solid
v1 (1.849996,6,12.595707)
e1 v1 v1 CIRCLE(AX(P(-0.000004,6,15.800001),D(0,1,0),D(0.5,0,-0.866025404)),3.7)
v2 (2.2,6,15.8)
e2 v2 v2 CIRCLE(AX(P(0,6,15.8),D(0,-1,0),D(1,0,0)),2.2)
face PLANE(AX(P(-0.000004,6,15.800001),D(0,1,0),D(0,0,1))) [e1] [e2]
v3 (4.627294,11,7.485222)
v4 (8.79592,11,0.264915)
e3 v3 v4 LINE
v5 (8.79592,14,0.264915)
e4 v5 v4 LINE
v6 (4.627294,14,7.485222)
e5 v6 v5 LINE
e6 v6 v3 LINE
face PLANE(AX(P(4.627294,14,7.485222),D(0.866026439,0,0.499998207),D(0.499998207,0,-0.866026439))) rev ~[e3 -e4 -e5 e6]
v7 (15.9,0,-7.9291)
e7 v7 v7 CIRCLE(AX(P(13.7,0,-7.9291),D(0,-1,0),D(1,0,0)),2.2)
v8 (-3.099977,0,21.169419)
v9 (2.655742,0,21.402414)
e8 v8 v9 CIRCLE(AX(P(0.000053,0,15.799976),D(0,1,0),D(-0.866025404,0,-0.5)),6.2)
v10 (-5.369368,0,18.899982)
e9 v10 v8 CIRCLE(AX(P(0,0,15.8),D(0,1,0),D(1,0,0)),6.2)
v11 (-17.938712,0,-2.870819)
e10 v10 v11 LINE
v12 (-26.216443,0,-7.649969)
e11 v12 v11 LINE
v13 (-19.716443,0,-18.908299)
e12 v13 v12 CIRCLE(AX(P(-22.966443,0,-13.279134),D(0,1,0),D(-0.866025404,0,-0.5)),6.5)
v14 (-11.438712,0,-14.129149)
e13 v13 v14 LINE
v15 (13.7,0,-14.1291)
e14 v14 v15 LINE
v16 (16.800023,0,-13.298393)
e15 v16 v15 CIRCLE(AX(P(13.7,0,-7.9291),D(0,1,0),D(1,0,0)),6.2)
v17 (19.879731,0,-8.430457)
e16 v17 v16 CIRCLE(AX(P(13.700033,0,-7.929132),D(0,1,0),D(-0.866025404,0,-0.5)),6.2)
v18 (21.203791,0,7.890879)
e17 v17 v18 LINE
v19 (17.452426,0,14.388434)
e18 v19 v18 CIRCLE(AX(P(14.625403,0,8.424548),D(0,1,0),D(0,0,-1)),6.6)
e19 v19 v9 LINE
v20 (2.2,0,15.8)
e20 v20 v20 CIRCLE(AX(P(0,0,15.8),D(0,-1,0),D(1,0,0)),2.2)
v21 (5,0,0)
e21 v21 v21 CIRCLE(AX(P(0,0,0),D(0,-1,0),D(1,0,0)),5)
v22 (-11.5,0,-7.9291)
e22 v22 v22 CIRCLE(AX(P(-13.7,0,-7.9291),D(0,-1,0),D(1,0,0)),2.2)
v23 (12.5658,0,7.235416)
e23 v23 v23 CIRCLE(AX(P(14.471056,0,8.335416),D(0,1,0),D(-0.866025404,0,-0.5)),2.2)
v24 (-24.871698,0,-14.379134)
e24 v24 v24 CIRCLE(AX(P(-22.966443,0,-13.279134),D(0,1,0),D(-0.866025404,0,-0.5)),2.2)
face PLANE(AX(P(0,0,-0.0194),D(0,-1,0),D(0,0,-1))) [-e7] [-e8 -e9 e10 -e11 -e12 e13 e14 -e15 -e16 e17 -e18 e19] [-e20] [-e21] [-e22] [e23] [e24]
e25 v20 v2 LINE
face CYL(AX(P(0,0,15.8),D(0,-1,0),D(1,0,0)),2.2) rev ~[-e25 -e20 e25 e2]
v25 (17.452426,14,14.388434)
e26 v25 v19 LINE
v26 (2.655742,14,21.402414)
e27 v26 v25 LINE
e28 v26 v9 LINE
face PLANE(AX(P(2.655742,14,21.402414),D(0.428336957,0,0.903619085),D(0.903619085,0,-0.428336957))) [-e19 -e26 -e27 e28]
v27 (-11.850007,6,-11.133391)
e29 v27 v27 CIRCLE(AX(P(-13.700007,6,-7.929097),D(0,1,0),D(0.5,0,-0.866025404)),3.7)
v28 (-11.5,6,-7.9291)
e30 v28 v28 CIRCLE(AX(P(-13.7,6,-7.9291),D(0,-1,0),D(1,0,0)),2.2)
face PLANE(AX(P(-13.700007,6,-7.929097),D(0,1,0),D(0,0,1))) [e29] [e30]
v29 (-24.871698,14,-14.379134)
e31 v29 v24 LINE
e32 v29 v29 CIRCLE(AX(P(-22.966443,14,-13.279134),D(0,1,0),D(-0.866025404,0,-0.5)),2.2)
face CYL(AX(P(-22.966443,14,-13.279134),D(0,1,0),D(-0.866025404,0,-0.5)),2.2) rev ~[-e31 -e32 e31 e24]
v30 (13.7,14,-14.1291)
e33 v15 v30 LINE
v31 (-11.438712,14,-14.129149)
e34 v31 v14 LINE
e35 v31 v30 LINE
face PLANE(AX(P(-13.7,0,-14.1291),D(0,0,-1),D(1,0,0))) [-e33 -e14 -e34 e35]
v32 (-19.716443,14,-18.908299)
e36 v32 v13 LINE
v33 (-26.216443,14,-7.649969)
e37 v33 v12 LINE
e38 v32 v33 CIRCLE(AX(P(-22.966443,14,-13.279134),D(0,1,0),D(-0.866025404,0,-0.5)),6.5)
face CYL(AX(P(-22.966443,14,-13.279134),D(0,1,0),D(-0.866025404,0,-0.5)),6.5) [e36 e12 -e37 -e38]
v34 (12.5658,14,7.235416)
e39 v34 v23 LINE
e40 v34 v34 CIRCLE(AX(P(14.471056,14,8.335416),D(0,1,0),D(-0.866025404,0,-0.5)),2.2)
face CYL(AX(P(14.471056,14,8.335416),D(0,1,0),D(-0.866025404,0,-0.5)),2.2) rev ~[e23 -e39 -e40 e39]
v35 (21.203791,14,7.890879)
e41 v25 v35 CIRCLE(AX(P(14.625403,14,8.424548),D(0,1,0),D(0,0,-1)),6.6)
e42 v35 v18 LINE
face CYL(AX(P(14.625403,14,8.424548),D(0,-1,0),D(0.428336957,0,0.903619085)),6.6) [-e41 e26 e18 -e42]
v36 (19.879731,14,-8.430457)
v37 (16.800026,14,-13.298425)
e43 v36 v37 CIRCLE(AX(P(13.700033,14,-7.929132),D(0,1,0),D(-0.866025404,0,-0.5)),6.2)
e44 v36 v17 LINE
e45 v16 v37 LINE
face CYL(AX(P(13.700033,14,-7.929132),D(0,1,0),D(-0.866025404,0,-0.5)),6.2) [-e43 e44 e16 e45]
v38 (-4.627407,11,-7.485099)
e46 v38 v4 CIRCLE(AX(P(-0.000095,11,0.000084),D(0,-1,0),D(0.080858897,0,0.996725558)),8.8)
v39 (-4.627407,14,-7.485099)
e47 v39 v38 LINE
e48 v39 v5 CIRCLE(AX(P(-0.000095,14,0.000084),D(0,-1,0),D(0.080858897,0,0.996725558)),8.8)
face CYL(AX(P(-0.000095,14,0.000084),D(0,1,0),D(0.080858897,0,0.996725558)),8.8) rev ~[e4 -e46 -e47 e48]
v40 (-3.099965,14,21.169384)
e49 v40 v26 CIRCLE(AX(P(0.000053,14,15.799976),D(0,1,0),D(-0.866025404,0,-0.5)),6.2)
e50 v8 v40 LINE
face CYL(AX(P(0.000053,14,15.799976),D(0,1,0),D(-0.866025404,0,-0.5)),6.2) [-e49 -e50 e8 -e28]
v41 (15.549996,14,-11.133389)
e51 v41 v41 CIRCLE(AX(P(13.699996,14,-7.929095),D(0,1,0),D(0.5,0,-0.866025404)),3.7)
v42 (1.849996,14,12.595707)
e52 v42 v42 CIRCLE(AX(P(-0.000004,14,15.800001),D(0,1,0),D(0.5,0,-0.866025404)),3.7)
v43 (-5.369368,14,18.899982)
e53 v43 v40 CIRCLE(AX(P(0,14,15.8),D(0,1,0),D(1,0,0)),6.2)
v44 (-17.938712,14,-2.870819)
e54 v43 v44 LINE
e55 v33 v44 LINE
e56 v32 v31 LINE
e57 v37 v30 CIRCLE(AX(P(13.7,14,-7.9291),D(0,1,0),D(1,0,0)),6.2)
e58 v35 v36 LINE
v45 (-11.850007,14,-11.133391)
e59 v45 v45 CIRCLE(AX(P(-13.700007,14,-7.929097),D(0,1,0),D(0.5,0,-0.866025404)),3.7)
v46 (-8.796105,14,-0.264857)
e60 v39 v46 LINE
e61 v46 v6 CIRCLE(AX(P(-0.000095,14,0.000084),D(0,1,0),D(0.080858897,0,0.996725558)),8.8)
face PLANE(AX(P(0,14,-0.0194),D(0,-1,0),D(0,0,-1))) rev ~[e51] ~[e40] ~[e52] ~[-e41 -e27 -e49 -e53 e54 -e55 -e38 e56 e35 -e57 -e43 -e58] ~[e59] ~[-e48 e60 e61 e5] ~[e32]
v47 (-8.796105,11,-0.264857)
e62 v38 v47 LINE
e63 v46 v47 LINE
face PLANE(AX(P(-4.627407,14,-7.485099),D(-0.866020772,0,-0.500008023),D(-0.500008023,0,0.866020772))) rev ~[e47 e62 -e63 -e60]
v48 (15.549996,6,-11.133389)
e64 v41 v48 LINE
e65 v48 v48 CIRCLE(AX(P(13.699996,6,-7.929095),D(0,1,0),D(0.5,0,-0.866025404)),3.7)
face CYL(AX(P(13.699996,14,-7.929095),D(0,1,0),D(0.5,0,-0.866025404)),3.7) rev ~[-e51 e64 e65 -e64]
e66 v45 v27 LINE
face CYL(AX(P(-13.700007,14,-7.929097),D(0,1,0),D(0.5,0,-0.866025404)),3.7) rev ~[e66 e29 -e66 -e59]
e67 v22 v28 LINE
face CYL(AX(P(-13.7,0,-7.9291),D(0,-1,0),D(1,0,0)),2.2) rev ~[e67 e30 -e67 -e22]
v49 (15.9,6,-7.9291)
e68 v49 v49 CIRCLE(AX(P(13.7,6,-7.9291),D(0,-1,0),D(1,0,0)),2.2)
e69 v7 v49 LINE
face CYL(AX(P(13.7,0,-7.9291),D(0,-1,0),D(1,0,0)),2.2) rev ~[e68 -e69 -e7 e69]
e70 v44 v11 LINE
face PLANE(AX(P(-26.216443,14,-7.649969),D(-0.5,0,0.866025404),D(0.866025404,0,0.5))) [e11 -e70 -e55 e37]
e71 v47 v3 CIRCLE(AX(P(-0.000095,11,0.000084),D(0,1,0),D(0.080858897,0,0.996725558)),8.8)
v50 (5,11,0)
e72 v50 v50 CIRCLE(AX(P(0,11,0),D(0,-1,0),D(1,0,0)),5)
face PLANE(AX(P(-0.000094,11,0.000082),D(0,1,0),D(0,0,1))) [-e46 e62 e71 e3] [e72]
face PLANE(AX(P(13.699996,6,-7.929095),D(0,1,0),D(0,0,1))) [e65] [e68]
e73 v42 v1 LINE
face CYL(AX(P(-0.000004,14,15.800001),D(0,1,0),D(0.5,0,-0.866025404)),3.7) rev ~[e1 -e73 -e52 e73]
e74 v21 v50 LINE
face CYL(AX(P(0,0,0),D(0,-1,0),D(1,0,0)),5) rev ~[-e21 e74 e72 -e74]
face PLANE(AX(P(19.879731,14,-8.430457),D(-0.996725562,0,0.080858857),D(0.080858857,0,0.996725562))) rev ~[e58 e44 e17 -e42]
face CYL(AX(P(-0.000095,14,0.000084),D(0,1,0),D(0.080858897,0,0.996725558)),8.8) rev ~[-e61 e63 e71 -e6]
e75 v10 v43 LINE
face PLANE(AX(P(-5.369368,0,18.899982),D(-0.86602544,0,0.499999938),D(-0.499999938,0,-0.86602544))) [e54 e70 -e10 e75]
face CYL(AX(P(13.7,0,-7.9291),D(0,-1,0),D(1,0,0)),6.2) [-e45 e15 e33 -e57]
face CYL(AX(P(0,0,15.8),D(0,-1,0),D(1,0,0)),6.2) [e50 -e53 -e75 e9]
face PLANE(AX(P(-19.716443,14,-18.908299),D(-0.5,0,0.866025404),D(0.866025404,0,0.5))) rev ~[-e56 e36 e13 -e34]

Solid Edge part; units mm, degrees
sketch "Sketch1" plane through (0, 0, 0) normal (0, -1, 0) x (1, 0, 0)
  line L0 (-5.3694, 18.9) -> (-19.0694, -4.8291)
  arc A0 (-13.7, -14.1291) -> (-19.0694, -4.8291) centre (-13.7, -7.9291) cw
  line L1 (-13.7, -14.1291) -> (13.7, -14.1291)
  arc A1 (19.0694, -4.8291) -> (13.7, -14.1291) centre (13.7, -7.9291) cw
  line L2 (5.3694, 18.9) -> (19.0694, -4.8291)
  arc A2 (-5.3694, 18.9) -> (5.3694, 18.9) centre (0, 15.8) cw
  dimension "D1" = 5.3694
extrude "Protrusion1" add sketch "Sketch1" against normal blind 14
sketch "Sketch2" plane through (0, 0, 0) normal (0, -1, 0) x (1, 0, 0)
  circle A0 centre (-13.7, -7.9291) radius 2.2
  circle A1 centre (13.7, -7.9291) radius 2.2
  circle A2 centre (0, 15.8) radius 2.2
  dimension "D1" = 20
  dimension "D2" = 4
  dimension "D3" = 4.4
  dimension "D4" = 6.2
  dimension "D5" = 6.2
  dimension "D6" = 4.4
  dimension "D7" = 6.2
  dimension "D8" = 27.4
  dimension "D9" = 27.4
  dimension "D10" = 27.4
extrude "Cutout1" cut sketch "Sketch2" against normal blind 457.8755
sketch "Sketch3" plane through (0, 0, 0) normal (0, -1, 0) x (1, 0, 0)
  circle A0 centre (0, 0) radius 5
extrude "Cutout2" cut sketch "Sketch3" against normal blind 434.4917
sketch "Sketch4" plane through (0, 0, 3.9355) normal (0, -1, 0) x (-0.5, 0, 0.8660254)
  line L0 (-23.325, -5.9323) -> (-23.325, -18.9323)
  line L1 (-23.325, -18.9323) -> (16.475, -18.9323)
  line L2 (16.475, -18.9323) -> (16.475, -5.9323)
  line L3 (12.7755, -8.7037) -> (16.475, -5.9323)
  line L4 (-20.9306, -8.7037) -> (12.7755, -8.7037)
  line L5 (-20.9306, -5.9323) -> (-20.9306, -8.7037)
  line L6 (-23.325, -5.9323) -> (-20.9306, -5.9323)
  dimension "D1" = 13
extrude "Protrusion2" add sketch "Sketch4" against normal up to vertex (14 mm away)
sketch "Sketch5" plane through (18.1083, 8, 10.4355) normal (0.8660254, 0, 0.5) x (-0.5, 0, 0.8660254)
  line L0 (-19.9, 8) -> (19.9, 8)
  line L1 (19.9, -6) -> (19.9, 8)
  line L2 (-19.9, -6) -> (19.9, -6)
  line L3 (-19.9, -6) -> (-19.9, 8)
extrude "ExtrudedProtrusion_14" add sketch "Sketch5" along normal blind 4
sketch "Sketch6" plane through (5.8112, 14, 7.7701) normal (0, 1, 0) x (0.5, 0, -0.8660254)
  circle A0 centre (3.8403, 24.7468) radius 3.7
  circle A1 centre (17.5403, 1.0177) radius 3.7
  circle A2 centre (-9.8597, 1.0177) radius 3.7
extrude "Cutout3" cut sketch "Sketch6" against normal blind 8
sketch "Sketch7" plane through (11.8615, 14, 7.7701) normal (0, 1, 0) x (-0.8660254, 0, -0.5)
  circle A0 centre (-2.5426, -0.8152) radius 2.2
  dimension "D1" = 6
  dimension "D2" = 19.9
  dimension "D3" = 4.4
extrude "ExtrudedCutout_23" cut sketch "Sketch7" against normal blind 166.5817
sketch "Sketch8" plane through (11.8615, 14, 7.7701) normal (0, 1, 0) x (-0.8660254, 0, -0.5)
  circle A0 centre (40.6865, -0.8152) radius 2.2
  line L0 (40.6865, 5.6848) -> (31.1282, 5.6848)
  line L1 (31.1282, 5.6848) -> (31.1282, 3.8832)
  line L2 (31.1282, 3.8832) -> (34.2429, 1.8592)
  line L3 (34.2429, 1.8592) -> (34.2429, -2.6486)
  line L4 (31.1282, -7.3152) -> (34.2429, -2.6486)
  line L5 (40.6865, -7.3152) -> (31.1282, -7.3152)
  arc A1 (40.6865, -7.3152) -> (40.6865, 5.6848) centre (40.6865, -0.8152) ccw
extrude "Protrusion3" add sketch "Sketch8" against normal up to vertex (14 mm away)
sketch "Sketch9" plane through (11.8615, 14, 7.7701) normal (0, 1, 0) x (-0.8660254, 0, -0.5)
  line L0 (-10.7426, -0.8152) -> (-10.7426, -20.7152)
  line L1 (-10.7426, -20.7152) -> (6.2574, -20.7152)
  arc A0 (1.1563, -18.0392) -> (6.2574, -20.7152) centre (6.2574, -14.5152) ccw
  line L2 (1.1563, -18.0392) -> (-10.7426, -0.8152)
extrude "Cutout4" cut sketch "Sketch9" against normal blind 85.4791
sketch "Sketch10" plane through (6.8865, 14, 7.7701) normal (0, 1, 0) x (-0.8660254, 0, -0.5)
  line L0 (-15.0511, 16.5973) -> (-15.0511, -3.3027)
  line L1 (-3.1522, 13.9213) -> (-15.0511, -3.3027)
  arc A0 (1.9489, 16.5973) -> (-3.1522, 13.9213) centre (1.9489, 10.3973) ccw
  line L2 (1.9489, 16.5973) -> (-15.0511, 16.5973)
extrude "ExtrudedCutout_27" cut sketch "Sketch10" against normal blind 118.3722
fillet "Round_1" radius 6.6 1 edges at (21.5724, 7, 12.4355)
sketch "Sketch11" plane through (-4.1206, 14, 1.1105) normal (0, 1, 0) x (0.0808589, 0, 0.9967256)
  line L0 (7.0612, 8.2038) -> (0.2016, 12.9426)
  arc A0 (-8.6084, 0.1899) -> (0.2016, 12.9426) centre (-0.7736, 4.1968) cw
  line L1 (-8.6084, 0.1899) -> (-1.7489, -4.5489)
  arc A1 (-1.7489, -4.5489) -> (7.0612, 8.2038) centre (-0.7736, 4.1968) ccw
extrude "ExtrudedCutout_28" cut sketch "Sketch11" against normal blind 3
